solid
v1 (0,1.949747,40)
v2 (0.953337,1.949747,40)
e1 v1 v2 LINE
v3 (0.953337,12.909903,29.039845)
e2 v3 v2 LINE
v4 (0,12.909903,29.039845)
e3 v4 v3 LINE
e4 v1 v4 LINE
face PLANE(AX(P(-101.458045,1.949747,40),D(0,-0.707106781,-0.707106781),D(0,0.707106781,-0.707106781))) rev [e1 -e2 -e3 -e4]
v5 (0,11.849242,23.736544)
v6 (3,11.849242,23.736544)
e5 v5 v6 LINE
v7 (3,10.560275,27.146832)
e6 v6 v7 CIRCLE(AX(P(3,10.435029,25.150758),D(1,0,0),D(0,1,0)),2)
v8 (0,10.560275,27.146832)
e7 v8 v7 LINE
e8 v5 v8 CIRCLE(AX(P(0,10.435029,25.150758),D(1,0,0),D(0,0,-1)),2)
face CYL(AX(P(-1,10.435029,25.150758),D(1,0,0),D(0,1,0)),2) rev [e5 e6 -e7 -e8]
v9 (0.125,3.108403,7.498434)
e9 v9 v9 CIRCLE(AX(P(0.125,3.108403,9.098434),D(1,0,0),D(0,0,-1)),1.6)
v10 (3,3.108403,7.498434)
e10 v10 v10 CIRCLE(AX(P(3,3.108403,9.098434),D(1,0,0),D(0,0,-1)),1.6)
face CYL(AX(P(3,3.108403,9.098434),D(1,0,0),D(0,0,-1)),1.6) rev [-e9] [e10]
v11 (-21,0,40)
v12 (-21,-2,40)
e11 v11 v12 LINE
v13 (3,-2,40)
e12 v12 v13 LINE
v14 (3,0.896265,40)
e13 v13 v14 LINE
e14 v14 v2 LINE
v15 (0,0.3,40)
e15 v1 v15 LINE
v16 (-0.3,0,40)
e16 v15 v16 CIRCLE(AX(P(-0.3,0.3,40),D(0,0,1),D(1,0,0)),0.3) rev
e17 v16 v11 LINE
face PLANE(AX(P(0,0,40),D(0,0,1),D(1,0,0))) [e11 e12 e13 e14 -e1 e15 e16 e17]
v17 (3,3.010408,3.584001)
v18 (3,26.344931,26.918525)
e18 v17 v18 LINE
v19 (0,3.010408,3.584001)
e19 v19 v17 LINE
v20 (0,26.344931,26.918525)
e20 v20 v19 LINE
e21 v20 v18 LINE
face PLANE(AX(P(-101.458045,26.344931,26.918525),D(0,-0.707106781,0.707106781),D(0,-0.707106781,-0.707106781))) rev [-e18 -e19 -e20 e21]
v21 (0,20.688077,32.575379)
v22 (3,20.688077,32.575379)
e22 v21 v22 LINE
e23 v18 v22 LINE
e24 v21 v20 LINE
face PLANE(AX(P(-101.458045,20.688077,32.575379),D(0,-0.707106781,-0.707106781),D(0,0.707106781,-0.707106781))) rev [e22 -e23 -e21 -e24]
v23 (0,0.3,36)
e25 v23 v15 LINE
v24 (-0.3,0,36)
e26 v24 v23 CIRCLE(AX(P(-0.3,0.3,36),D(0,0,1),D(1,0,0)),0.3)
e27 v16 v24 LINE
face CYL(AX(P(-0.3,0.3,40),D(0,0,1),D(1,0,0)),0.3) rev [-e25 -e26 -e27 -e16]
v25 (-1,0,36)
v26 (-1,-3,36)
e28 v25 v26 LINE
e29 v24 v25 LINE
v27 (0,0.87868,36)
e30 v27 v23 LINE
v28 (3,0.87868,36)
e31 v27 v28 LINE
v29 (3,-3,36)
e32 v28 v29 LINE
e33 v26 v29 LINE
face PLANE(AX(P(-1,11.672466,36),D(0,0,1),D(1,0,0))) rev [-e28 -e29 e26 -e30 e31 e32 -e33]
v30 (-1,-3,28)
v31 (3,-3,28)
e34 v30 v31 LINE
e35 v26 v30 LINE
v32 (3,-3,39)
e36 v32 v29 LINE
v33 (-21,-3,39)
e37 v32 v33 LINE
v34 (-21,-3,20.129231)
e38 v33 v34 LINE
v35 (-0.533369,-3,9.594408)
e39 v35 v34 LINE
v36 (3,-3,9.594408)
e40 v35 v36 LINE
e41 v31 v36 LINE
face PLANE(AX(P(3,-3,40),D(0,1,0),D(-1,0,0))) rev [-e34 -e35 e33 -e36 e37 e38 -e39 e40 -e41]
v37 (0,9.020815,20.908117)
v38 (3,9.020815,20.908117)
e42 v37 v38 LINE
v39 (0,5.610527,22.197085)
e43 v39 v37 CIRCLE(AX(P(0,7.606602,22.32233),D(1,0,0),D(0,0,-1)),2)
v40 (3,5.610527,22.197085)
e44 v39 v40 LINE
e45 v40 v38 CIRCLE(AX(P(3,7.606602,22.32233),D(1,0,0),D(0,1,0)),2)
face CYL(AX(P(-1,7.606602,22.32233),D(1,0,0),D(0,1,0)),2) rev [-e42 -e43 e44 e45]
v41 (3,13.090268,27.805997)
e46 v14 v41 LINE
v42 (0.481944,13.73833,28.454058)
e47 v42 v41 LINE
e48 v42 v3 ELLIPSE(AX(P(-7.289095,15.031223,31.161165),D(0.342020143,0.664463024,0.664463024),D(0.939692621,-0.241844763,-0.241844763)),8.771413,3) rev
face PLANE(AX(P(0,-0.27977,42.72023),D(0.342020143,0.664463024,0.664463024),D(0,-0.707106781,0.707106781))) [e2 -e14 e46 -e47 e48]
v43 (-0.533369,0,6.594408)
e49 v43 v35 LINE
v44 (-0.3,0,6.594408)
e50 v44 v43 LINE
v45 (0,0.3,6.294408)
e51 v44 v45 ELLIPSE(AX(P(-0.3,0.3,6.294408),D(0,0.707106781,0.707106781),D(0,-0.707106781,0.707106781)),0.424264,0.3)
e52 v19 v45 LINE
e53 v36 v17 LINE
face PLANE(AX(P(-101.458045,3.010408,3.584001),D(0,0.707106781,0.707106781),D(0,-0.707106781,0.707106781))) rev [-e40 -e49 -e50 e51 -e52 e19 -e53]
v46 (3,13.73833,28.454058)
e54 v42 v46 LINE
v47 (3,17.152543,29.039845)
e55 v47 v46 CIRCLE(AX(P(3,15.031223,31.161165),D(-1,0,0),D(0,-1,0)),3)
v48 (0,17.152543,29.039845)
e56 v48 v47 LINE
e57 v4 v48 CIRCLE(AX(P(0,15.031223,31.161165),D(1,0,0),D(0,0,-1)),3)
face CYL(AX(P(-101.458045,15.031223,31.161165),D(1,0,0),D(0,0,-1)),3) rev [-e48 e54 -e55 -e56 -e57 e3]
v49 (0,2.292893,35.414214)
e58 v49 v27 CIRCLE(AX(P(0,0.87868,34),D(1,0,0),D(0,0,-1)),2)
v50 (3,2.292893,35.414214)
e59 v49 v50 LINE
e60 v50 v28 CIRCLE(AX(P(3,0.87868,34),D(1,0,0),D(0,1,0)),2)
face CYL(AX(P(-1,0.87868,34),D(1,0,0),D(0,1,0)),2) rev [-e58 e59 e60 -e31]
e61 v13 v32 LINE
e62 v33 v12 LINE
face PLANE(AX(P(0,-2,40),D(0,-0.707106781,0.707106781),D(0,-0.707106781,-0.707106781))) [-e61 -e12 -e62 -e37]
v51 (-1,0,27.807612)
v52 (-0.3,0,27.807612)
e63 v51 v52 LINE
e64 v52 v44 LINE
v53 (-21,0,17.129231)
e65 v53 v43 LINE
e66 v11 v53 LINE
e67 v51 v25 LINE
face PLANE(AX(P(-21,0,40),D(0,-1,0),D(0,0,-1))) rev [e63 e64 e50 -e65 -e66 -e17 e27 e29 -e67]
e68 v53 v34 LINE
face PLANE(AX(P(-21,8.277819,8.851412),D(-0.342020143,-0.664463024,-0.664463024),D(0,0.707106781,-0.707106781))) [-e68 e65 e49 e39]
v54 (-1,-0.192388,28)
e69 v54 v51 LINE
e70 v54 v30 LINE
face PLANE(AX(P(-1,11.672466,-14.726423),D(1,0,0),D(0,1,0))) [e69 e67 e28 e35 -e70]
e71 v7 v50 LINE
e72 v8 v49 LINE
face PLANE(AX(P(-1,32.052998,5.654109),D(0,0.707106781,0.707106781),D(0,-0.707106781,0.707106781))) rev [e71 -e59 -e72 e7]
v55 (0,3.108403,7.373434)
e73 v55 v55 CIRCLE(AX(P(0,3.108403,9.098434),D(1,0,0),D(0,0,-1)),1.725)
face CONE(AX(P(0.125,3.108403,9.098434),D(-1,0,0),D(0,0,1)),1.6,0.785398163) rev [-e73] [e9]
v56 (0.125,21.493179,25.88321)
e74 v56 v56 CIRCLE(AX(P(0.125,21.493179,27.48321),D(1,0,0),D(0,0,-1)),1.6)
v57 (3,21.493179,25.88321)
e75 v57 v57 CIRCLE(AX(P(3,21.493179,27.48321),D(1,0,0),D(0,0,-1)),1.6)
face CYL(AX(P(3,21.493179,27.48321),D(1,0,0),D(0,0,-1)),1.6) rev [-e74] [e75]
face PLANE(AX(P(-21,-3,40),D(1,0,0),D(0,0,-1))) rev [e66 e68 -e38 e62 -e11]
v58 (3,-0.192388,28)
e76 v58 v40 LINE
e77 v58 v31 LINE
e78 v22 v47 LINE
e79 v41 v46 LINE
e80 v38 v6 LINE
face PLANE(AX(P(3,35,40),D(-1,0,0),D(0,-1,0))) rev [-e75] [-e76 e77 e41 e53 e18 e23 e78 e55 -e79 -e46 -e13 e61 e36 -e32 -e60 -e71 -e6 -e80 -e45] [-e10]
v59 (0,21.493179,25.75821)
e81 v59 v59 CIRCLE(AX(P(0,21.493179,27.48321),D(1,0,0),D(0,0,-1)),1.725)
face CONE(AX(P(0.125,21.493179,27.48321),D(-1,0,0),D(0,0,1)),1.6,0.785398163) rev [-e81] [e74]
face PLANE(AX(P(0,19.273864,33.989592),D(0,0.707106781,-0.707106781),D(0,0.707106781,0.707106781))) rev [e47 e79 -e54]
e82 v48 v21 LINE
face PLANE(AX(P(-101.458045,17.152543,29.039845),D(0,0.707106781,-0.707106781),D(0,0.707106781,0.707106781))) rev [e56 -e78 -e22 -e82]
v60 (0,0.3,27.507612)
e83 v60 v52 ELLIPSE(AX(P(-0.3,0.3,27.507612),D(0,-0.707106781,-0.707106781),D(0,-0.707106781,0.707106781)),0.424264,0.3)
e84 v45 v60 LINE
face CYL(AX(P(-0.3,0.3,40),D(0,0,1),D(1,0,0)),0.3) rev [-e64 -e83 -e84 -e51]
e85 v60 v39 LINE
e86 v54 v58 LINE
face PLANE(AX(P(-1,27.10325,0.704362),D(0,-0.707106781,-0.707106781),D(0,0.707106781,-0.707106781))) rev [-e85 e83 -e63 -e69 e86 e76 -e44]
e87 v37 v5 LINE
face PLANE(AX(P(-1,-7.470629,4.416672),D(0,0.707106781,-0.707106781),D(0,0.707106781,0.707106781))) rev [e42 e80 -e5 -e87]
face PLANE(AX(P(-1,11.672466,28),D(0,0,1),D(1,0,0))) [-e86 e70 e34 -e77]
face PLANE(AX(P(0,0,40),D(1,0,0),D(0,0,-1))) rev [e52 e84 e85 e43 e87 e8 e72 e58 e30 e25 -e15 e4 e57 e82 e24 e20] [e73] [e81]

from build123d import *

# Parameters (mm, degrees)
EXTRUDE_1_DEPTH     = 40
CUT_EXTRUDE_START   = -3
CUT_EXTRUDE_1_DEPTH = 24
CUT_EXTRUDE_2_DEPTH = 53.224395281
CUT_EXTRUDE_3_DEPTH = 4
CUT_EXTRUDE_START_2 = 2
CUT_EXTRUDE_6_DEPTH = 50.413883947
CHAMFER_1_SIZE      = 1
FILLET_1_R          = 0.3


# Read off the part's stored shape, not the designer's step: Вырез-Вытянуть1, Отверстие с зазором M31
with BuildPart() as part:
    # Эскиз1 → Бобышка-Вытянуть1 (new body)
    with BuildSketch(Plane.XY):
        Polygon((0, 0), (0, 35), (3, 35), (3, -3), (-21, -3), (-21, 0), align=None)
    extrude(amount=EXTRUDE_1_DEPTH)

    # Вырез-Вытянуть1 outline → Вырез-Вытянуть1 (cut)
    with BuildSketch(Plane.ZY.offset(CUT_EXTRUDE_START)):
        with BuildLine():
            ThreePointArc((29.039844892, 17.152543264), (28.161165235, 15.03122292), (29.039844892, 12.909902577))
            Line((29.039844892, 12.909902577), (40, 1.949747468))
            Line((40, 1.949747468), (40, 35))
            Line((40, 35), (0, 35))
            Line((0, 35), (0, -3))
            Line((0, -3), (9.594408409, -3))
            Line((9.594408409, -3), (3.584000769, 3.01040764))
            Line((3.584000769, 3.01040764), (26.918524548, 26.344931419))
            Line((26.918524548, 26.344931419), (32.575378798, 20.68807717))
            Line((32.575378798, 20.68807717), (29.039844892, 17.152543264))
        make_face()
    extrude(amount=CUT_EXTRUDE_1_DEPTH, mode=Mode.SUBTRACT)

    # Эскиз3 → Вырез-Вытянуть2 (cut, through all)
    with BuildSketch(Plane(origin=(0, -0.286796564, 0.286796564), x_dir=(1, 0, 0), z_dir=(0, 0.7071067811865488, -0.7071067811865462))):
        Polygon((-118.62691727, -47.645487261), (-21, -12.112195311), (-0.533369199, -4.662950904), (97.093548071, 30.870341046), (26.026964172, 226.124175586), (-189.693501169, 147.608347279), align=None)
    extrude(amount=-CUT_EXTRUDE_2_DEPTH, mode=Mode.SUBTRACT)

    # Эскиз4 → Вырез-Вытянуть3 (cut)
    with BuildSketch(Plane(origin=(3, 0, 0), x_dir=(0, 0, -1), z_dir=(1, 0, 0))):
        with BuildLine():
            Line((-28, -3), (-28, -0.192388155))
            Line((-28, -0.192388155), (-22.197084645, 5.610527199))
            ThreePointArc((-22.197084645, 5.610527199), (-20.451501777, 6.899494937), (-20.908116908, 9.02081528))
            Line((-20.908116908, 9.02081528), (-23.736544033, 11.849242405))
            ThreePointArc((-23.736544033, 11.849242405), (-25.857864376, 12.305857536), (-27.146832114, 10.560274668))
            Line((-27.146832114, 10.560274668), (-35.414213562, 2.292893219))
            ThreePointArc((-35.414213562, 2.292893219), (-35.847759065, 1.644046521), (-36, 0.878679656))
            Line((-36, 0.878679656), (-36, -3))
            Line((-36, -3), (-28, -3))
        make_face()
    extrude(amount=-CUT_EXTRUDE_3_DEPTH, mode=Mode.SUBTRACT)

    # Эскиз5 → Вырез-Вытянуть6 (cut, through all)
    with BuildSketch(Plane(origin=(0, -5.943650814, 5.943650814), x_dir=(1, 0, 0), z_dir=(0, -0.7071067811865488, 0.7071067811865464)).offset(CUT_EXTRUDE_START_2)):
        Polygon((0, 30.009937166), (3, 28.918026463), (3, 37.662950904), (0, 37.662950904), align=None)
    extrude(amount=CUT_EXTRUDE_6_DEPTH, mode=Mode.SUBTRACT)

    # Фаска1
    chamfer_1_edges = [part.edges().sort_by_distance(p)[0] for p in [
        (-9, -3, 40),
    ]]
    chamfer(chamfer_1_edges, length=CHAMFER_1_SIZE)

    # Отверстие с зазором M31 outline → Отверстие с зазором M31 (revolve, cut)
    with BuildSketch(Plane(origin=(0, 3.108402615, 9.098433688), x_dir=(0, 1, 0), z_dir=(0, 0, -1))):
        Polygon((0, 0), (1.725, 0), (1.6, 0.125), (1.6, 3), (0, 3), align=None)
    revolve(axis=Axis((0, 3.108402615, 9.098433688), (1, 0, 0)), mode=Mode.SUBTRACT)

    # Hole Wizard M31 2 outline → Hole Wizard M31 2 (revolve, cut)
    with BuildSketch(Plane(origin=(0, 21.493178926, 27.483209999), x_dir=(0, 1, 0), z_dir=(0, 0, -1))):
        Polygon((0, 0), (1.725, 0), (1.6, 0.125), (1.6, 3), (0, 3), align=None)
    revolve(axis=Axis((0, 21.493178926, 27.483209999), (1, 0, 0)), mode=Mode.SUBTRACT)

    # Скругление1
    fillet_1_edges = [part.edges().sort_by_distance(p)[0] for p in [
        (0, 0, 38),
        (0, 0, 17.201010127),
    ]]
    fillet(fillet_1_edges, radius=FILLET_1_R)


solid = part.part
